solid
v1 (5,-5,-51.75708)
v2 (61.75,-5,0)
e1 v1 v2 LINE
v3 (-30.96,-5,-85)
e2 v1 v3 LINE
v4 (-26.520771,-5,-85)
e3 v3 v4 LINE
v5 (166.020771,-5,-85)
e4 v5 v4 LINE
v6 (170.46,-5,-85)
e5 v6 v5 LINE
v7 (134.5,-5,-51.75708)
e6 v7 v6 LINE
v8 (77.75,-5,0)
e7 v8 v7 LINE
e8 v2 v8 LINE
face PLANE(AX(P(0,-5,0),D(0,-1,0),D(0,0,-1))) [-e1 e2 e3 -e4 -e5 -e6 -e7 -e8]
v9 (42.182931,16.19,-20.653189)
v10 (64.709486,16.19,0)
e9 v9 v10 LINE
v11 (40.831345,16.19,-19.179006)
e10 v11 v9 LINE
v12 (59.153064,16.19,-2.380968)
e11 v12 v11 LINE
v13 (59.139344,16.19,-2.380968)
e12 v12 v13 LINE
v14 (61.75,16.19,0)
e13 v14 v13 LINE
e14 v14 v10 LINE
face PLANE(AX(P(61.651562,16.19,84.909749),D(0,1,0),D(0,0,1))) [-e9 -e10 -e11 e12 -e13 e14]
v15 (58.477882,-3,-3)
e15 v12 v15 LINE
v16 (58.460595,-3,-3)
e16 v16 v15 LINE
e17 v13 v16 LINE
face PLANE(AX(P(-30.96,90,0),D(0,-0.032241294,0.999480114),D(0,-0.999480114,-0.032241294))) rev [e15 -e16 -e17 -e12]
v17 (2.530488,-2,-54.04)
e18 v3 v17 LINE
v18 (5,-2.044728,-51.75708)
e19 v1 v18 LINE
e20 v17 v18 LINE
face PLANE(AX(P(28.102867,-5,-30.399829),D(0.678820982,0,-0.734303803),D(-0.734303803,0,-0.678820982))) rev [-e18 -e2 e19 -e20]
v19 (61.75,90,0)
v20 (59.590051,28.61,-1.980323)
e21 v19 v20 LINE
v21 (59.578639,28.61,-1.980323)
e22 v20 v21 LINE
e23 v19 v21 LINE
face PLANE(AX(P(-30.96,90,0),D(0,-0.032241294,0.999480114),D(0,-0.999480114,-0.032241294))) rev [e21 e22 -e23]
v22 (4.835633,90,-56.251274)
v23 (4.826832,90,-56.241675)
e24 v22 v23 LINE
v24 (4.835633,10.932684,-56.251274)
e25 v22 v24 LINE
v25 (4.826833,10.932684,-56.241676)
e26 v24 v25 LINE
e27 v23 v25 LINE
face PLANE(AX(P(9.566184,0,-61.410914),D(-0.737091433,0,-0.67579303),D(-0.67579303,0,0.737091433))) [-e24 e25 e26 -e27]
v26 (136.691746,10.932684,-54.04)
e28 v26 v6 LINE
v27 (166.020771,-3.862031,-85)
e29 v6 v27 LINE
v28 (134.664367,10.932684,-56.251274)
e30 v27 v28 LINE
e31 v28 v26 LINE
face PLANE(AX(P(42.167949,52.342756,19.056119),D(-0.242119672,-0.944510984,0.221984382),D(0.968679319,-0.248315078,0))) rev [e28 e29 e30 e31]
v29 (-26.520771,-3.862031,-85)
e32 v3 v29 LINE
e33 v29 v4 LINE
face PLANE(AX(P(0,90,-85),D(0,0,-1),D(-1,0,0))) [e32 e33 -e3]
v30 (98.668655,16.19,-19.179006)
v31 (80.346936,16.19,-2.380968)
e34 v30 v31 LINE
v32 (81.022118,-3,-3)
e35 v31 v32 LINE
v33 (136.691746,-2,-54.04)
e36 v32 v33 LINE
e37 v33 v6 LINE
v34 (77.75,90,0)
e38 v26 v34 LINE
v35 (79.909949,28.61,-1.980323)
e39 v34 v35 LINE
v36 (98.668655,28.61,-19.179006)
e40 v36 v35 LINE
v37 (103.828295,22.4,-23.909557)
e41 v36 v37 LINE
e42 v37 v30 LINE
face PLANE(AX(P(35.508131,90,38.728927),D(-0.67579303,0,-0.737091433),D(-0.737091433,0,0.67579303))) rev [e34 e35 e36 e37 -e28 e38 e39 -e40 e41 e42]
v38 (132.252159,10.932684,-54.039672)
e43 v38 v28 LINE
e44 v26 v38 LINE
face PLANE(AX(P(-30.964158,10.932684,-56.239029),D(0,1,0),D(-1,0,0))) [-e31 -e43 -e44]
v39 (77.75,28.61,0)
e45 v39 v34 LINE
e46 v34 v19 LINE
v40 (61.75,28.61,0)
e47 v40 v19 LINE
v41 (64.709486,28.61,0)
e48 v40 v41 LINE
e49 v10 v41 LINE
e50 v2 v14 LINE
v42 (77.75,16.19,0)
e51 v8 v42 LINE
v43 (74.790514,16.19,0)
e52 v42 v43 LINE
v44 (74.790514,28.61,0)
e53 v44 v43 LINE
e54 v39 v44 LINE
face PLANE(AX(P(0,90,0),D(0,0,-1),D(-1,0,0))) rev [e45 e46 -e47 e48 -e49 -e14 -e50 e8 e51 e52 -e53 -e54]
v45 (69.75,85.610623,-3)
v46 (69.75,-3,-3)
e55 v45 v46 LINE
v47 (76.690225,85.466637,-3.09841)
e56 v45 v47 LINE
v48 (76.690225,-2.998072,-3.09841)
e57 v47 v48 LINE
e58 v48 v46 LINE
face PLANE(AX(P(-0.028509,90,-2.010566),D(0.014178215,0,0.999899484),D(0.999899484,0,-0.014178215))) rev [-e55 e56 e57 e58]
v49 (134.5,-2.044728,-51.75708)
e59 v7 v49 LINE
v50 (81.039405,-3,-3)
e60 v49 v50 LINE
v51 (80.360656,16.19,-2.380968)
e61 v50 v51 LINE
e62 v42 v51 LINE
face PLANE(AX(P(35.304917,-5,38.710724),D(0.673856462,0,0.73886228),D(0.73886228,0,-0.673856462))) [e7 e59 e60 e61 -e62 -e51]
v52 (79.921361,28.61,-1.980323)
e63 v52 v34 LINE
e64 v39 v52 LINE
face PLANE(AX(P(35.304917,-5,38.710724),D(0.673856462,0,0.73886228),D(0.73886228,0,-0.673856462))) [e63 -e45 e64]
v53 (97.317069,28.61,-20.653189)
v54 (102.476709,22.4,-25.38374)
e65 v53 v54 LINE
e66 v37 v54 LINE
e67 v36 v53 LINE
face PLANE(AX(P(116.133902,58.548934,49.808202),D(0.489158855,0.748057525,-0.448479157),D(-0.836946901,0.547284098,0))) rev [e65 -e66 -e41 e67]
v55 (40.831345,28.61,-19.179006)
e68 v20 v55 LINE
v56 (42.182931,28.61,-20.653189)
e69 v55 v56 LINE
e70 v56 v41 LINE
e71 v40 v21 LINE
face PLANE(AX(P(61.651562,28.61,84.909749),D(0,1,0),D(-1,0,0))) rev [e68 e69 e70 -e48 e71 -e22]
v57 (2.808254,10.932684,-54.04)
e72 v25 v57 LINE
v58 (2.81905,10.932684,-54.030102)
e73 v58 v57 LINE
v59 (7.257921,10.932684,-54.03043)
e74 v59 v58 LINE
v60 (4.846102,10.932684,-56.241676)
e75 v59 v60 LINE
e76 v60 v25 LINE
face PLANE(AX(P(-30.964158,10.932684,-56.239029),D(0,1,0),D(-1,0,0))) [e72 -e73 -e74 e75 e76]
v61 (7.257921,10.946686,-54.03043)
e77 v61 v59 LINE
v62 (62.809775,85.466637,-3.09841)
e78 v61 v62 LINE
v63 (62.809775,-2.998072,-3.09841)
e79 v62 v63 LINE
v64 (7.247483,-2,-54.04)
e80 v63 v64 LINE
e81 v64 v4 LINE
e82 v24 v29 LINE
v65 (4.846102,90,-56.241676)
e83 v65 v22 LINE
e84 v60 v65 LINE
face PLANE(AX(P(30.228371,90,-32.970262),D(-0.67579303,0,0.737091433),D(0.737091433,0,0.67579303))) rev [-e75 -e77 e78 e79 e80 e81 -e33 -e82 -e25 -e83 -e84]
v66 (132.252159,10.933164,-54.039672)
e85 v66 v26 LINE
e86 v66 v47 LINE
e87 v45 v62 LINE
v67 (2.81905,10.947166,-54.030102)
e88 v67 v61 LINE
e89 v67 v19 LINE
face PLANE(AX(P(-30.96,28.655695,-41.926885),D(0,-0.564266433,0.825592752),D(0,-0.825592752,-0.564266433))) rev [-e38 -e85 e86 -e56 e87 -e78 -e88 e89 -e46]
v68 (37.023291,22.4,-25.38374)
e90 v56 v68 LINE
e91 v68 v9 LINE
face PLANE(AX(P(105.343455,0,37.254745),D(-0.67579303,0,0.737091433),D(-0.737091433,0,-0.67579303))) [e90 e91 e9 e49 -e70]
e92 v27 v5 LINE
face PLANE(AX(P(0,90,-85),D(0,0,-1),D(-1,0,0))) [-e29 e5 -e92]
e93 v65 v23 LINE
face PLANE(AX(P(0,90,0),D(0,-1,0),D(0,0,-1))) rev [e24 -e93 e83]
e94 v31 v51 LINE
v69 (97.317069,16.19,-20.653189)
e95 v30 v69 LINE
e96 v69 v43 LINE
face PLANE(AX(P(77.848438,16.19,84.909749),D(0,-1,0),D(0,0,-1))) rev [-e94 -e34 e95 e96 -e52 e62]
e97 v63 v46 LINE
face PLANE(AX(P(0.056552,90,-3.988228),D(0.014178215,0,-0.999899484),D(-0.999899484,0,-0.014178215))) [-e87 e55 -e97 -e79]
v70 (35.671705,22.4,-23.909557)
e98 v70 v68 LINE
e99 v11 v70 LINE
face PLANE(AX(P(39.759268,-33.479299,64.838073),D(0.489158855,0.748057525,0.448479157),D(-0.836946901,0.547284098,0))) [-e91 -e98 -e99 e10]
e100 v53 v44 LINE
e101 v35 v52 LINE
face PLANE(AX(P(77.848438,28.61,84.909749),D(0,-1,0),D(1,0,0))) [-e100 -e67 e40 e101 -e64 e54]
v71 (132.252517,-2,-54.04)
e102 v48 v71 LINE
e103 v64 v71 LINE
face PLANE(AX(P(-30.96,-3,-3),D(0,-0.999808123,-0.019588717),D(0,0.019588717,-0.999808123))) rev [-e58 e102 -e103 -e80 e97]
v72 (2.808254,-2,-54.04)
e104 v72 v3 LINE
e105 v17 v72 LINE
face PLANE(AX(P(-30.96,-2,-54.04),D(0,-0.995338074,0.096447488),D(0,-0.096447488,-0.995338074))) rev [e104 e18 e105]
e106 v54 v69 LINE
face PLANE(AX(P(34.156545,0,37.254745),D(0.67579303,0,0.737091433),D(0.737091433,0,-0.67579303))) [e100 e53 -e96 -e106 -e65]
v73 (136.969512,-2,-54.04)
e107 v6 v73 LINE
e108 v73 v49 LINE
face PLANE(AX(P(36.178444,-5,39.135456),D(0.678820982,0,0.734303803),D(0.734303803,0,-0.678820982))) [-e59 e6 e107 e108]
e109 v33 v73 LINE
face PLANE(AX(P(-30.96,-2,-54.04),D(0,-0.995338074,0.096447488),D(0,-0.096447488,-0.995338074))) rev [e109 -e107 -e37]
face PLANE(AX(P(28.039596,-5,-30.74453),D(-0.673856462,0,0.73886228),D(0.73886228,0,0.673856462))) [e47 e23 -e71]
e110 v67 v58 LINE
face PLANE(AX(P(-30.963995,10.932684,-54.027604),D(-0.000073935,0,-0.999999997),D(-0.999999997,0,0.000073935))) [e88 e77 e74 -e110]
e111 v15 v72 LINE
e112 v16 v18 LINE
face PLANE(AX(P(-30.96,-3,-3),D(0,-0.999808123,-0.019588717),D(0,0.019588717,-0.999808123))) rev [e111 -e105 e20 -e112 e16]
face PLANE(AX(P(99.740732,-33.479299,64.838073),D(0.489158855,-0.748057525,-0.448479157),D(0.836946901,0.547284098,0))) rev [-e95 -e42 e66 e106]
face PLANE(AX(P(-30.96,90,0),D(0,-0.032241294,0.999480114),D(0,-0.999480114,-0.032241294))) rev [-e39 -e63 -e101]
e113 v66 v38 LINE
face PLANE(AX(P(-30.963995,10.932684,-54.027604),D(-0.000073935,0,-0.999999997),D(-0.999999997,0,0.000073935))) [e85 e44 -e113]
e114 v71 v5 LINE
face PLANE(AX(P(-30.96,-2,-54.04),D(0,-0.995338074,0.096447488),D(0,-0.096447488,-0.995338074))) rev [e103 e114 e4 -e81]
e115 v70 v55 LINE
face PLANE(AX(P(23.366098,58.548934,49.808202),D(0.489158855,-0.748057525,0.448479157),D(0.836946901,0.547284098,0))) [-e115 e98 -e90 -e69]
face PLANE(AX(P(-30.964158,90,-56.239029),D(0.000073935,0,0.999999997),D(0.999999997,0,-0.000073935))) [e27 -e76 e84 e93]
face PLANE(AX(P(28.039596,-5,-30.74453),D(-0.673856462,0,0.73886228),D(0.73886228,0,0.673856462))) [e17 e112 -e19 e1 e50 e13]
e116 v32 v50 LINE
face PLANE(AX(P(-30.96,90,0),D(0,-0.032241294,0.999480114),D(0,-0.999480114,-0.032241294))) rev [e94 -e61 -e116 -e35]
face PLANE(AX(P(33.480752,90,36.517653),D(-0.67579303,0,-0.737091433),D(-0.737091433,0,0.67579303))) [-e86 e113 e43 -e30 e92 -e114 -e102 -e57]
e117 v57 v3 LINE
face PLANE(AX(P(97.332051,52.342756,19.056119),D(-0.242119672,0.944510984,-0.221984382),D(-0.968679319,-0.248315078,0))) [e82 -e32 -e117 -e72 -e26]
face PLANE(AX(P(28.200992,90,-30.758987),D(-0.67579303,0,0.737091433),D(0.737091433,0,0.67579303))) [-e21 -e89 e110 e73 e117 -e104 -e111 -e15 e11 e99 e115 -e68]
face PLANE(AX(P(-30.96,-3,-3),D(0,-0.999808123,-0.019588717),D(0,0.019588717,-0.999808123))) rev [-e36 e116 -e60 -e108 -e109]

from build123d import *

# Parameters (mm, degrees)
BOSS_EXTRUDE3_START      = -5
BOSS_EXTRUDE3_DEPTH      = 95
CUT_EXTRUDE1_DEPTH       = 211.669436796
CUT_EXTRUDE1_DEPTH_BACK  = 211.669436796
BOSS_EXTRUDE10_DEPTH     = 95
CUT_EXTRUDE2_DEPTH       = 211.669436796
CUT_EXTRUDE2_DEPTH_BACK  = 211.669436796
CUT_EXTRUDE7_DEPTH       = 211.669436796
CUT_EXTRUDE7_DEPTH_BACK  = 211.669436796
CUT_EXTRUDE12_START      = -3
CUT_EXTRUDE12_DEPTH      = 3
CUT_EXTRUDE18_DEPTH      = 263.682253196
CUT_EXTRUDE18_DEPTH_BACK = 263.682253196
CUT_EXTRUDE23_START      = -2
SKETCH26_W               = 5.160164367
SKETCH26_H               = 12.42
CUT_EXTRUDE23_DEPTH      = 207.011897718


# Read off the part's stored shape, not the designer's step: Cut-Extrude12
with BuildPart() as part:
    # Sketch4 → Boss-Extrude3 (new body)
    with BuildSketch(Plane(origin=(0, 0, 0), x_dir=(1, 0, 0), z_dir=(0, 1, 0)).offset(BOSS_EXTRUDE3_START)):
        Polygon((0, 54.04), (-30.96, 85), (170.46, 85), (139.5, 54.04), (139.5, 0), (0, 0), align=None)
    extrude(amount=BOSS_EXTRUDE3_DEPTH)

    # Sketch5 → Cut-Extrude1 (cut, two sides: drawn at the far end of the back side and taken through both)
    with BuildSketch(Plane(origin=(139.5, 0, 0), x_dir=(0, 0, -1), z_dir=(1, 0, 0)).offset(-CUT_EXTRUDE1_DEPTH_BACK)):
        Polygon((0, 90), (3, -3), (54.04, -2), (85, -5), (85, 90), align=None)
    extrude(amount=CUT_EXTRUDE1_DEPTH + CUT_EXTRUDE1_DEPTH_BACK, mode=Mode.SUBTRACT)

    # Sketch12 → Boss-Extrude10 (add)
    with BuildSketch(Plane.XZ.offset(5)):
        Polygon((77.75, 0), (61.75, 0), (5.136208879, -51.905643893), (1.313057643, -55.410852123), (-30.96, -85), (-26.520771025, -85), (62.809775082, -3.09840989), (69.75, -3), (76.690224918, -3.09840989), (166.020771025, -85), (170.46, -85), (138.186942357, -55.410852123), (134.363791121, -51.905643893), align=None)
    extrude(amount=-BOSS_EXTRUDE10_DEPTH)

    # Sketch6 → Cut-Extrude2 (cut, two sides: drawn at the far end of the back side and taken through both)
    with BuildSketch(Plane(origin=(139.5, 0, 0), x_dir=(0, 0, -1), z_dir=(1, 0, 0)).offset(-CUT_EXTRUDE2_DEPTH_BACK)):
        Polygon((54.04, 90), (0, 90), (54.04, 10.932684034), align=None)
    extrude(amount=CUT_EXTRUDE2_DEPTH + CUT_EXTRUDE2_DEPTH_BACK, mode=Mode.SUBTRACT)

    # Sketch18 → Cut-Extrude7 (cut, two sides: drawn at the far end of the back side and taken through both)
    with BuildSketch(Plane(origin=(0, 0, 0), x_dir=(1, 0, 0), z_dir=(0, 1, 0)).offset(-CUT_EXTRUDE7_DEPTH_BACK)):
        Polygon((-30.96, 85), (-32.039877687, 0), (5, 0), (5, 51.757080067), align=None)
        Polygon((61.75, 0), (5, 0), (5, 51.757080067), align=None)
        Polygon((134.5, 0), (77.75, 0), (134.5, 51.757080067), align=None)
        Polygon((170.46, 0), (134.5, 0), (134.5, 51.757080067), (170.46, 85), align=None)
    extrude(amount=CUT_EXTRUDE7_DEPTH + CUT_EXTRUDE7_DEPTH_BACK, mode=Mode.SUBTRACT)

    # Cut-Extrude12 outline → Cut-Extrude12 (cut)
    with BuildSketch(Plane(origin=(37.313647502, 0, 37.073562316), x_dir=(0.7370914330343759, 0, -0.6757930299635608), z_dir=(0.6757930299635608, 0, 0.7370914330343759)).offset(CUT_EXTRUDE12_START)):
        Polygon((134.824655296, 90), (134.824655296, 10.932684034), (180.637498322, -5), (180.637498322, 90), align=None)
    cut_extrude12 = extrude(amount=CUT_EXTRUDE12_DEPTH, mode=Mode.SUBTRACT)

    # Sketch24 → Cut-Extrude18 (cut, two sides: drawn at the far end of the back side and taken through both)
    with BuildSketch(Plane(origin=(-45.105018851, -43.594474596, -16.544137217), x_dir=(-6.841846231332114e-05, 0.3790169981348638, -0.9253897073361853), z_dir=(0.999999997266826, 0, -7.393475590237281e-05)).offset(-CUT_EXTRUDE18_DEPTH_BACK)):
        Polygon((55.352567213, 36.252396593), (85.320423961, 109.420477175), (87.366853148, 108.582309818), (57.398996399, 35.414229236), align=None)
    extrude(amount=CUT_EXTRUDE18_DEPTH + CUT_EXTRUDE18_DEPTH_BACK, mode=Mode.SUBTRACT)

    # Mirror4: Cut-Extrude12 across plane
    add(cut_extrude12.mirror(Plane(origin=(69.75, 0, 0), x_dir=(0, 0, 1), z_dir=(1, 0, 0))), mode=Mode.SUBTRACT)

    # Sketch26 → Cut-Extrude23 (cut)
    with BuildSketch(Plane(origin=(35.508131054, 0, 38.728927412), x_dir=(0.7370914330343759, 0, -0.6757930299635608), z_dir=(0.6757930299635608, 0, 0.7370914330343759)).offset(CUT_EXTRUDE23_START)):
        Polygon((67.688858918, 28.61), (85.688858918, 28.61), (92.688858918, 22.4), (85.688858918, 16.19), (67.688858918, 16.19), align=None)
        with Locations((54.728776735, 22.4)):
            Rectangle(SKETCH26_W, SKETCH26_H)
        Polygon((67.688858918, 16.19), (67.688858918, 28.61), (60.239227379, 28.61), (60.832079248, 16.19), align=None)
        Polygon((60.832079248, 16.19), (60.239227379, 28.61), (57.308858918, 28.61), (57.308858918, 16.19), align=None)
    cut_extrude23 = extrude(amount=CUT_EXTRUDE23_DEPTH, mode=Mode.SUBTRACT)

    # Mirror5: Cut-Extrude23 across plane
    add(cut_extrude23.mirror(Plane(origin=(69.75, 0, 0), x_dir=(0, 0, 1), z_dir=(1, 0, 0))), mode=Mode.SUBTRACT)


solid = part.part
